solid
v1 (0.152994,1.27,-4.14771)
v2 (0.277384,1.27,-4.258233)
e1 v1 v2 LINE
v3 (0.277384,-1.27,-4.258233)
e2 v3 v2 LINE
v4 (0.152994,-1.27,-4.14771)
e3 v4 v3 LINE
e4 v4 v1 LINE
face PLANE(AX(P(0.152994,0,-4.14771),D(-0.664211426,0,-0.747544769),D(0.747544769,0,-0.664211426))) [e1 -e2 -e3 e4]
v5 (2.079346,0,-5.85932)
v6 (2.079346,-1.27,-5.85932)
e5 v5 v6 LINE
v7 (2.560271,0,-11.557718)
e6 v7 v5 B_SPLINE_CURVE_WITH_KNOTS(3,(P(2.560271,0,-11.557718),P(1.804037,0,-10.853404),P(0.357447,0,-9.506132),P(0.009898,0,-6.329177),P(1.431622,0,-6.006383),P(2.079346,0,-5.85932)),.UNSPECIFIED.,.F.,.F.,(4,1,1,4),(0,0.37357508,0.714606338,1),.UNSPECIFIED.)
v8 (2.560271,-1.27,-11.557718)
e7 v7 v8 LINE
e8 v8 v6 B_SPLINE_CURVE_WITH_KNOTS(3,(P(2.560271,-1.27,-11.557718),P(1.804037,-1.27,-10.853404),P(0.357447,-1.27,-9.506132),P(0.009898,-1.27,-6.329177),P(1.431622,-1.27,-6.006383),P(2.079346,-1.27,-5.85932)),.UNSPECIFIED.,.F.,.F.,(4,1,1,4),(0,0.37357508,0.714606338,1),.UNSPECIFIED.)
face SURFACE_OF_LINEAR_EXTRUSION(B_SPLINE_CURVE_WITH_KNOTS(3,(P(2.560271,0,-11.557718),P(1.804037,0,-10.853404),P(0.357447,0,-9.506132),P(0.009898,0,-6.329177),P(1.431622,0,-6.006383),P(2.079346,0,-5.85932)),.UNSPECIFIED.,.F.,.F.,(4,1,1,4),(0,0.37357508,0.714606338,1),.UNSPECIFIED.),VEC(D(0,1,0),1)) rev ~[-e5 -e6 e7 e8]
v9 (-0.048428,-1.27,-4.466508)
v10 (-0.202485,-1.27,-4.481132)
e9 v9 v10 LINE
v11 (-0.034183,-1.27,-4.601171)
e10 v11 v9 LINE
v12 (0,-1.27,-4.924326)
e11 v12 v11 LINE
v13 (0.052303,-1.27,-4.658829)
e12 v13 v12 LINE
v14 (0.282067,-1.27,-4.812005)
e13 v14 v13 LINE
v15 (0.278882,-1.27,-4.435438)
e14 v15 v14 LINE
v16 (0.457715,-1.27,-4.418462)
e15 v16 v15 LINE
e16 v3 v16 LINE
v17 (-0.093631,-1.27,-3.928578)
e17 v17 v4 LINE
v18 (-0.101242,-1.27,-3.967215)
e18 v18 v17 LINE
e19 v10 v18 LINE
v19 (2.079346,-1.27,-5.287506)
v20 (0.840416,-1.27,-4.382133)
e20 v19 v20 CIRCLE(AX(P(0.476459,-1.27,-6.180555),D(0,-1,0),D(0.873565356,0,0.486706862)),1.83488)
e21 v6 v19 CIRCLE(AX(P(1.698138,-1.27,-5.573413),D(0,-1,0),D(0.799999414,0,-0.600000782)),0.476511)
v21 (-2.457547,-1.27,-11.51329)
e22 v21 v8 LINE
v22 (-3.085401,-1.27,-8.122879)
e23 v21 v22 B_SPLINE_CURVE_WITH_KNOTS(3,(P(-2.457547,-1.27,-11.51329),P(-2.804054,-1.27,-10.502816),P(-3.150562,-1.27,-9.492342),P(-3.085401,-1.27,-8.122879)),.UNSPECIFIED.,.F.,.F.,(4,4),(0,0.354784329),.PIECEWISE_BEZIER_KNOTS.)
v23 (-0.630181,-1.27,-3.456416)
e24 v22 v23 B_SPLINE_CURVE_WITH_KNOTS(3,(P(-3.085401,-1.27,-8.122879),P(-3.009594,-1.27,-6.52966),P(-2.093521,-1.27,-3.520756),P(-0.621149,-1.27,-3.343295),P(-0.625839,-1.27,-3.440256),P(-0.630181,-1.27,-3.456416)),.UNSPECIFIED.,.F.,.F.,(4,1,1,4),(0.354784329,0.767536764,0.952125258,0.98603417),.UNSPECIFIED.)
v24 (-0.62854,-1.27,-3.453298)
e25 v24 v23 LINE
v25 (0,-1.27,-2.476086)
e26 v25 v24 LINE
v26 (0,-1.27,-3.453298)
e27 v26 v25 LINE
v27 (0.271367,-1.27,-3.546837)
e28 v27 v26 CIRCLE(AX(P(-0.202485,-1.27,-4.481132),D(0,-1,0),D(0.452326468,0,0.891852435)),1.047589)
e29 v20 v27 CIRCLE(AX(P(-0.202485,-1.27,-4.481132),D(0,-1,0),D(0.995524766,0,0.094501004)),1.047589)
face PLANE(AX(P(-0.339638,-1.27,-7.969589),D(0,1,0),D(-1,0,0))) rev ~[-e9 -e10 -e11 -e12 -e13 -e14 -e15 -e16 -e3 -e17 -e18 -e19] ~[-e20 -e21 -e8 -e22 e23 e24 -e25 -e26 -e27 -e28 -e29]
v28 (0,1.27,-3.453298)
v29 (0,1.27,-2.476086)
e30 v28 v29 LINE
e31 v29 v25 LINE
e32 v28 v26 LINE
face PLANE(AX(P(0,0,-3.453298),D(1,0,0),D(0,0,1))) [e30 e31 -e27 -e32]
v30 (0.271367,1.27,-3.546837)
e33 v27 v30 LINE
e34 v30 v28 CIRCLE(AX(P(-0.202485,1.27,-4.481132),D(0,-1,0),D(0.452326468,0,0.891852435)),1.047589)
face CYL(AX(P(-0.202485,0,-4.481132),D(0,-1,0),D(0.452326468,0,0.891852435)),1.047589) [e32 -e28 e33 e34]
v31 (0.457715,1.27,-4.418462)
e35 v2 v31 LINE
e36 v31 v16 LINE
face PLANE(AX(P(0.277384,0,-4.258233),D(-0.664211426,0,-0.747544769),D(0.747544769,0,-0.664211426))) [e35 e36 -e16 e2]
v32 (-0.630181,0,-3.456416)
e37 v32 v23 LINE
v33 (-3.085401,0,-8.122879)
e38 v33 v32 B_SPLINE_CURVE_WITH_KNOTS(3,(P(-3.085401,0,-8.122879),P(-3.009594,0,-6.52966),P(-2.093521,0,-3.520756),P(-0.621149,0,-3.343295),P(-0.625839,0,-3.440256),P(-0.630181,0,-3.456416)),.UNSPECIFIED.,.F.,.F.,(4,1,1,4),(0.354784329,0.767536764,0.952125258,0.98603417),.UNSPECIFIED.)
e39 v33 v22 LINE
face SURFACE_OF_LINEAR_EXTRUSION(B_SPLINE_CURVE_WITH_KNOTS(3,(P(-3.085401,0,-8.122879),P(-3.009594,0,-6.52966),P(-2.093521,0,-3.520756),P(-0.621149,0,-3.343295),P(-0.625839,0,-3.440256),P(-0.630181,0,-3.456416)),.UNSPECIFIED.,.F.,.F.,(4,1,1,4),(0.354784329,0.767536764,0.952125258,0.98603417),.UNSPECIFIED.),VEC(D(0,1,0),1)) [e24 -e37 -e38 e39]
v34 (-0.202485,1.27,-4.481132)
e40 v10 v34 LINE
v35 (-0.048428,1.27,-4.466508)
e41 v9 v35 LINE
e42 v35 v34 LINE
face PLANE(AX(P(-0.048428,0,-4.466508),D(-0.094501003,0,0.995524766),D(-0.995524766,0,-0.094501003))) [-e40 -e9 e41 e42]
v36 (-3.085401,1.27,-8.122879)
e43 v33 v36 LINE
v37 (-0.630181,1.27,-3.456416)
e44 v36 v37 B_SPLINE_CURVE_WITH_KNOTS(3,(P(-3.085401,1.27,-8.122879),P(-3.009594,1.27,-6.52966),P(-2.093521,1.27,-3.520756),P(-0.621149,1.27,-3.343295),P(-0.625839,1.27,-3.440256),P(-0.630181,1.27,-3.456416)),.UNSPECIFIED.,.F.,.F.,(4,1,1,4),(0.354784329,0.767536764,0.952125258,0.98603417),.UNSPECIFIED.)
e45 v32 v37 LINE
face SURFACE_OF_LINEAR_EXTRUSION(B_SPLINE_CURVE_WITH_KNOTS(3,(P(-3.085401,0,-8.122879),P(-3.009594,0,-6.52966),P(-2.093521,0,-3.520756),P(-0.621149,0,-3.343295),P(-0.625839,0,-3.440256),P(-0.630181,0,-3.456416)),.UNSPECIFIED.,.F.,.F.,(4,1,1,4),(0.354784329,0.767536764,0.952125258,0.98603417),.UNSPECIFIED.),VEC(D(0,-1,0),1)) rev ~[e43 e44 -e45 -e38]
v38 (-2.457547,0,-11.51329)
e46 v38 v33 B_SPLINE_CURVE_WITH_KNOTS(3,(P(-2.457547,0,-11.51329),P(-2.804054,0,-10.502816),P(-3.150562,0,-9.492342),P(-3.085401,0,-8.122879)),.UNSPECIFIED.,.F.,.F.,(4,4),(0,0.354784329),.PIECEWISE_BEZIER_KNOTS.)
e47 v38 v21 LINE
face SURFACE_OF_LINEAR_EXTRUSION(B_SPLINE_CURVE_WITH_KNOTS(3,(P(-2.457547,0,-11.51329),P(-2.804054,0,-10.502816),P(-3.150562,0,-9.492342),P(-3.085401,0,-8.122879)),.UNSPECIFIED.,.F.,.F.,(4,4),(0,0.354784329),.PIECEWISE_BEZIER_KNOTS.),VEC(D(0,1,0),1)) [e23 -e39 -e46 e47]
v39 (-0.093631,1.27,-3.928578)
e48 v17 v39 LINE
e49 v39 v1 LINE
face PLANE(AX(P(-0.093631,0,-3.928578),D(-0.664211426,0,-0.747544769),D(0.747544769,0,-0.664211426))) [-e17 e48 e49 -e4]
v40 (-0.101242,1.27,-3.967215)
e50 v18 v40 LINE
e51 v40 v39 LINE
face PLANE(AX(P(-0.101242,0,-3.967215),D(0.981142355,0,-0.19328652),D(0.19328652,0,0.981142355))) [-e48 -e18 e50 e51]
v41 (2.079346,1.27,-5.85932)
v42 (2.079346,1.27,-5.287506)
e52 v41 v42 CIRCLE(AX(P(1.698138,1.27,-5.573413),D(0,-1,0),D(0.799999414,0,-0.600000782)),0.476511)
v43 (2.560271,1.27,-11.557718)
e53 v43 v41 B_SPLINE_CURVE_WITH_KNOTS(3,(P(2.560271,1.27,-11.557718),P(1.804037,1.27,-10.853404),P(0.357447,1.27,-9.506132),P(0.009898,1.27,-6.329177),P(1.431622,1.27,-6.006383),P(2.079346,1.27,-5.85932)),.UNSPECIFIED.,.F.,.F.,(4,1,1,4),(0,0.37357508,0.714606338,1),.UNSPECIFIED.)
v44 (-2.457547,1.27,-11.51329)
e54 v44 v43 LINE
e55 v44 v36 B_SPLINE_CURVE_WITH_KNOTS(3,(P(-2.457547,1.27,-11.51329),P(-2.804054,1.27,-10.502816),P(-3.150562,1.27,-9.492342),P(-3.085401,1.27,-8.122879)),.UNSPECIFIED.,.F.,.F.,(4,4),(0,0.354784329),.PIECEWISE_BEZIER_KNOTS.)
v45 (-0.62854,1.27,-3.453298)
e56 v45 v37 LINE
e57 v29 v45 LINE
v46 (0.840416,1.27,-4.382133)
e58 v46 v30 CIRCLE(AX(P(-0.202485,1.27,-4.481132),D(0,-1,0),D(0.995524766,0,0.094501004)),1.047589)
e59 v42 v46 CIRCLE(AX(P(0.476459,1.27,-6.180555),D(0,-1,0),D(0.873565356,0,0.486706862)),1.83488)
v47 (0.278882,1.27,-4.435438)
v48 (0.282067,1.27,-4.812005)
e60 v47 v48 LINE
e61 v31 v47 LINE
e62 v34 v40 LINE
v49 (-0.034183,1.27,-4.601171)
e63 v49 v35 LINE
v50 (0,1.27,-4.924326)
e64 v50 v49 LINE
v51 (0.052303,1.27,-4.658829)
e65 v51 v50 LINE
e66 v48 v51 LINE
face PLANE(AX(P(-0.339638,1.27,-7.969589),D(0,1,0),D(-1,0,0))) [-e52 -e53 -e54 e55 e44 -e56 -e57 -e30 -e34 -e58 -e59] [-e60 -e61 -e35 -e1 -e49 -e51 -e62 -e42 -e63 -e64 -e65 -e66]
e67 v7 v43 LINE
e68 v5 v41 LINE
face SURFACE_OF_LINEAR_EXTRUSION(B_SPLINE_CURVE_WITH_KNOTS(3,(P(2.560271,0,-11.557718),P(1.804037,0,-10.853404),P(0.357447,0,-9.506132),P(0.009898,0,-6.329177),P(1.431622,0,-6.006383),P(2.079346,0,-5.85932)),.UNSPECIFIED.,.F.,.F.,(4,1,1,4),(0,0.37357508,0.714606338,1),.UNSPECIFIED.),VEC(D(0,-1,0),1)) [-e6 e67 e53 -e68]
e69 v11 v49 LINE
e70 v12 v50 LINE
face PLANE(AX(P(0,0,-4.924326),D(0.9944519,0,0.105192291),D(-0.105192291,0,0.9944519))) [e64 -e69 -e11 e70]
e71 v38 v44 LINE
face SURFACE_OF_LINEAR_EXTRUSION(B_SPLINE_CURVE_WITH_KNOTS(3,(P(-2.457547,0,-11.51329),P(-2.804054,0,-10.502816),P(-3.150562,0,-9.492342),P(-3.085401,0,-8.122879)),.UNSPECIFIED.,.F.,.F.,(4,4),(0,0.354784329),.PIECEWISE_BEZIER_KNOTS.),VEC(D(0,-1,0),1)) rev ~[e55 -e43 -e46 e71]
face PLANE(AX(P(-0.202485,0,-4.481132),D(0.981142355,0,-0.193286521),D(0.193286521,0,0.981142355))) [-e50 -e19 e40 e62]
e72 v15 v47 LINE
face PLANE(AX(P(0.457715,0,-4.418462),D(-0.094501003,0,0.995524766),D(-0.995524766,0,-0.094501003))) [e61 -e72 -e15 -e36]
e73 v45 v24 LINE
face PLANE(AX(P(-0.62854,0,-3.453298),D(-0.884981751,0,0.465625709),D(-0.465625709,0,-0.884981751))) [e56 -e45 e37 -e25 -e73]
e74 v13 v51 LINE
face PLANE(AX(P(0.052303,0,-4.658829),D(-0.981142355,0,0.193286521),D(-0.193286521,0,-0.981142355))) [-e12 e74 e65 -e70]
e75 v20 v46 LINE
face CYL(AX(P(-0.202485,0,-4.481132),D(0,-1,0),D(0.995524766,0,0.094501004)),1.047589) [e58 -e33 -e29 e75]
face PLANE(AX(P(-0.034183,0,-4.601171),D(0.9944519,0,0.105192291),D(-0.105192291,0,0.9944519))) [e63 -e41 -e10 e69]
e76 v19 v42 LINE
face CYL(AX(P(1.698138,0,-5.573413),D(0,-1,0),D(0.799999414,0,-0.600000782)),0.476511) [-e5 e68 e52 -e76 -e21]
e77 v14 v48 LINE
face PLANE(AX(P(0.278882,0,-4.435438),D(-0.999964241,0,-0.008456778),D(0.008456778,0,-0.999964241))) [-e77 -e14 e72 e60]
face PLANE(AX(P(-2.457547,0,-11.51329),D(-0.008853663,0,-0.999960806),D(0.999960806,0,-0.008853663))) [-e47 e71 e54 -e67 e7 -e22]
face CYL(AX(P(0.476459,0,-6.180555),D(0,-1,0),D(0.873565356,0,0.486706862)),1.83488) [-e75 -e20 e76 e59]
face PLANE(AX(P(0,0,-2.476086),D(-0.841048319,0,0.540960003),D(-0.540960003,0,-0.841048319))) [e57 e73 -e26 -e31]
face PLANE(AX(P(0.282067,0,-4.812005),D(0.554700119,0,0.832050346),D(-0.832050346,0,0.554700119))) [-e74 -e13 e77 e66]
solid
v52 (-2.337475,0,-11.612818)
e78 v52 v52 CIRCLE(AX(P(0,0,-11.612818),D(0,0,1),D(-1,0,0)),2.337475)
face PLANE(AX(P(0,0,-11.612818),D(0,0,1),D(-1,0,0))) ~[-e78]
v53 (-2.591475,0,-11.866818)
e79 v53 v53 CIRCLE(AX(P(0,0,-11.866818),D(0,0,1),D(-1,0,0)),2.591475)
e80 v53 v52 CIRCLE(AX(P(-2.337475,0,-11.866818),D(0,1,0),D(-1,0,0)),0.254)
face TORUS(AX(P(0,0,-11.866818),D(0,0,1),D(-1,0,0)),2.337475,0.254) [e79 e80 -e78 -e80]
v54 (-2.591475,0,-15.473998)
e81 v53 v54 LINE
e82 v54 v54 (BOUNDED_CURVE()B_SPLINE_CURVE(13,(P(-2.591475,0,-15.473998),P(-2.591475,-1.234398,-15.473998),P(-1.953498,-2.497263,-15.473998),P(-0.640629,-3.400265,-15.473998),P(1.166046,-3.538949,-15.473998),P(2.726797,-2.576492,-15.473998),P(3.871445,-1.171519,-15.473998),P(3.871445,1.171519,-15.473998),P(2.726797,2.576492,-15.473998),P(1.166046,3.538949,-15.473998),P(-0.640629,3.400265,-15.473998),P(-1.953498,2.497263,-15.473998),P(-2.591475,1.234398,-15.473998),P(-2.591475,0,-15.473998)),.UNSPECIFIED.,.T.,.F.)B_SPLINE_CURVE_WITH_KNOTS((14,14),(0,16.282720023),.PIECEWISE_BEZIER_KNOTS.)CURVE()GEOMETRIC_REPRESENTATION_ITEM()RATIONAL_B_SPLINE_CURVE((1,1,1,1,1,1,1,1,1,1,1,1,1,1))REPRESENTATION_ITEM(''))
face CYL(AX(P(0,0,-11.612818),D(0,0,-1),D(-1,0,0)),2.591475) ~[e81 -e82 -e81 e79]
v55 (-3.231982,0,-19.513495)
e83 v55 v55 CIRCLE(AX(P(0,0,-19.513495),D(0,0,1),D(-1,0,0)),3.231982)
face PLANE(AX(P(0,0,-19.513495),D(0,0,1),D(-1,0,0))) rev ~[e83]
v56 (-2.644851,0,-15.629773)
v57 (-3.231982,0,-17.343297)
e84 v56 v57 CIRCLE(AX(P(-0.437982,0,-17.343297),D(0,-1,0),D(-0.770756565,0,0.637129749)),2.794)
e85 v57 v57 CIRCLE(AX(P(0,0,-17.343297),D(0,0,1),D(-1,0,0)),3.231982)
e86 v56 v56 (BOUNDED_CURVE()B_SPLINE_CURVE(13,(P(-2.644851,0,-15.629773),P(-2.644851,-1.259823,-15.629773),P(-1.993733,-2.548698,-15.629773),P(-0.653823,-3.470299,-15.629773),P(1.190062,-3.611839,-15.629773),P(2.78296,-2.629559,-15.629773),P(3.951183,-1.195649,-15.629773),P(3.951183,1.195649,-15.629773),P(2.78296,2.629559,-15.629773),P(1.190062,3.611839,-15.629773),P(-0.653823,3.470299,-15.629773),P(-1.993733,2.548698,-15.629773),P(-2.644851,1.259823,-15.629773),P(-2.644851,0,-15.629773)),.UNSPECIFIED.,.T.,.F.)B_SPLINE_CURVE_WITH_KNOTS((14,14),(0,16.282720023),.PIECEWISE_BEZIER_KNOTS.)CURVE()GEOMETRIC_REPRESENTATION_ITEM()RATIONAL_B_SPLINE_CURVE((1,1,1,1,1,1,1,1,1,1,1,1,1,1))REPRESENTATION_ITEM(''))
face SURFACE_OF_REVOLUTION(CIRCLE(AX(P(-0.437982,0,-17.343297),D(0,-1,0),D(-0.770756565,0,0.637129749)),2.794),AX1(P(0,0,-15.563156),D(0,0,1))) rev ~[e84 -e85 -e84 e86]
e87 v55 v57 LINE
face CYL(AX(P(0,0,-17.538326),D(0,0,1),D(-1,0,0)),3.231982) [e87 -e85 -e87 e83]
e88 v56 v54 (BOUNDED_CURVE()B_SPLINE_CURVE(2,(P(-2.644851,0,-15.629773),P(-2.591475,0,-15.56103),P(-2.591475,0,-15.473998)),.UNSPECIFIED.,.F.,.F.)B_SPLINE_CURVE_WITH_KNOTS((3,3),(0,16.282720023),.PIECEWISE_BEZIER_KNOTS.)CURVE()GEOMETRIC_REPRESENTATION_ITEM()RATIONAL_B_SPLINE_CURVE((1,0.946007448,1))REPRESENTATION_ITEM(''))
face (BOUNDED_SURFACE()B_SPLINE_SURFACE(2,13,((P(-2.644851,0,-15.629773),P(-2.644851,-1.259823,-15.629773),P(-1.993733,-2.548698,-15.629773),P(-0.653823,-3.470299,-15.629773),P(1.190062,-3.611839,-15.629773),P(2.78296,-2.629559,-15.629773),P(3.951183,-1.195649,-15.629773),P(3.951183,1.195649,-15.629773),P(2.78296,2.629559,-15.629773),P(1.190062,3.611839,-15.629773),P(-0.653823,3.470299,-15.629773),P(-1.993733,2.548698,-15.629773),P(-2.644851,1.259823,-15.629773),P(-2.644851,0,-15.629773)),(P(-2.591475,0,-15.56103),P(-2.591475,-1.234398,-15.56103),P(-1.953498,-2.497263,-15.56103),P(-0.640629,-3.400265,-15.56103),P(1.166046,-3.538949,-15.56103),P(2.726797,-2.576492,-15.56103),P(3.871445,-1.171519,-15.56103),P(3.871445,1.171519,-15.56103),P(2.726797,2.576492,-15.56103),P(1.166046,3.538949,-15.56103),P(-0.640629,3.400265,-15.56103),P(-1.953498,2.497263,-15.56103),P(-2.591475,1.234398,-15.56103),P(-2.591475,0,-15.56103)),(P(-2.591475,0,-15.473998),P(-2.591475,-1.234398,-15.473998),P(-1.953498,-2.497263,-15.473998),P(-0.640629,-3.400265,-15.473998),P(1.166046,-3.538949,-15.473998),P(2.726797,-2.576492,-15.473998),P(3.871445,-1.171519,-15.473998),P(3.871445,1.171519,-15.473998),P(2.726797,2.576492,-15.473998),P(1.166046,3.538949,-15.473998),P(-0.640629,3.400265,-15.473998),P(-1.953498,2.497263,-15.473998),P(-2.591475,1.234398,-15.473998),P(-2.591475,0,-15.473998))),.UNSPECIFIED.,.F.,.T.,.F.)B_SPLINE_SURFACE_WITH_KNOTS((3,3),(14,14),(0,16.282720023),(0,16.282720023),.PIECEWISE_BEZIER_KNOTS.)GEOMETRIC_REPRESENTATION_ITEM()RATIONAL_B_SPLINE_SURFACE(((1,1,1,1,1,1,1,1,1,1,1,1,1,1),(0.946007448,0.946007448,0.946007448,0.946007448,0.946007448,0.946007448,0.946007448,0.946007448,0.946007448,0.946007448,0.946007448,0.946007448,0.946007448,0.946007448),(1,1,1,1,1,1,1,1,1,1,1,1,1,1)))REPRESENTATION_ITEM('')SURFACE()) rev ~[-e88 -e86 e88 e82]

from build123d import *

# Parameters (mm, degrees)
F0_W     = 0.6405061577
F0_H     = 3.9503388107
F3_DEPTH = 1.27
F5_R     = 0.254


# Not quite as in the source:
# - a fillet or chamfer that OpenCascade refuses, or shapes differently, is made with other operations: its cross-section is extruded or revolved along the edge and cut away or added


with BuildPart() as f1:
    # F0 (on Front) → F1 (revolve)
    with BuildSketch(Plane.XZ):
        Polygon((-2.5914753787, -19.5134952664), (0, -19.5134952664), (0, -11.6128176451), (-2.5914753787, -11.6128176451), (-2.5914753787, -15.5631564558), align=None)
        with Locations((-2.9117284575, -17.5383258611)):
            Rectangle(F0_W, F0_H)
    revolve(axis=Axis((0, 0, -15.5631564558), (0, 0, 1)))

    # F4: fillet of radius 2.794 on 1 edges, made by hand

    # F4_s1 → F4_t2 (revolve, cut)
    with BuildSketch(Plane.XZ):
        with BuildLine():
            ThreePointArc((-2.5914753787, -15.5631564558), (-3.0669830384, -16.397365106), (-3.2319815364, -17.3432969758))
            Line((-3.2319815364, -17.3432969758), (-3.2319815364, -15.5631564558))
            Line((-3.2319815364, -15.5631564558), (-2.5914753787, -15.5631564558))
        make_face()
    revolve(axis=Axis((0, 0, -15.5631564558), (0, 0, 1)), mode=Mode.SUBTRACT)

    # F5
    f5_edges = [f1.edges().sort_by_distance(p)[0] for p in [
        (-2.591475, 0, -13.587987),
        (2.591475, 0, -15.563156),
        (2.591475, 0, -11.612818),
    ]]
    fillet(f5_edges, radius=F5_R)


with BuildPart() as f3:
    # F2 (on Front) → F3 (new body, symmetric)
    with BuildSketch(Plane.XZ):
        with BuildLine():
            add(Edge.make_bspline(
                [(-2.4575470015, -11.5132899955), (-2.8040543568, -10.5028159539), (-3.1505617121, -9.4923419122), (-3.0854009092, -8.1228790805)],
                knots=[0, 0, 0, 0, 0.3547843289, 0.3547843289, 0.3547843289, 0.3547843289], degree=3))
            Line((-2.4575470015, -11.5132899955), (2.560271183, -11.5577178076))
            add(Edge.make_bspline(
                [(2.560271183, -11.5577178076), (1.8040367585, -10.8534037399), (0.3574469273, -9.5061316042), (0.0098981732, -6.329177487), (1.4316217442, -6.0063825673), (2.07934645, -5.859320052)],
                knots=[0, 0, 0, 0, 0.3735750804, 0.7146063376, 1, 1, 1, 1], degree=3))
            Line((2.07934645, -5.859320052), (1.7303656682, -5.5492422712))
            Line((1.7303656682, -5.5492422712), (0.4577149879, -4.418461669))
            Line((0.4577149879, -4.418461669), (0.2788823039, -4.4354375079))
            Line((0.2788823039, -4.4354375079), (0.2820669615, -4.8120045103))
            Line((0.2820669615, -4.8120045103), (0.0523033026, -4.6588287686))
            Line((0.0523033026, -4.6588287686), (0, -4.9243257381))
            Line((0, -4.9243257381), (-0.0341830133, -4.6011712362))
            Line((-0.0341830133, -4.6011712362), (-0.0484276129, -4.4665076697))
            Line((-0.0484276129, -4.4665076697), (-0.2024847872, -4.4811316731))
            Line((-0.2024847872, -4.4811316731), (-0.1012423936, -3.9672148204))
            Line((-0.1012423936, -3.9672148204), (-0.0936308252, -3.9285777125))
            Line((-0.0936308252, -3.9285777125), (-0.6285401519, -3.4532979677))
            Line((-0.6285401519, -3.4532979677), (-0.6301807522, -3.4564161403))
            Line((-0.6301807522, -3.4564161403), (-3.0854009092, -8.1228790805))
        make_face()
        with BuildLine():
            add(Edge.make_bspline(
                [(-3.0854009092, -8.1228790805), (-3.009593502, -6.5296601241), (-2.0935214667, -3.5207561612), (-0.6211493091, -3.3432954942), (-0.6258393316, -3.4402559318), (-0.6301807522, -3.4564161403)],
                knots=[0.3547843289, 0.3547843289, 0.3547843289, 0.3547843289, 0.7675367637, 0.9521252582, 0.9860341697, 0.9860341697, 0.9860341697, 0.9860341697], degree=3))
            Line((-3.0854009092, -8.1228790805), (-0.6301807522, -3.4564161403))
        make_face()
        with BuildLine():
            Line((1.7303656682, -5.5492422712), (2.07934645, -5.859320052))
            ThreePointArc((2.07934645, -5.859320052), (2.1746489219, -5.573413102), (2.07934645, -5.2875061519))
            Line((2.07934645, -5.2875061519), (1.7303656682, -5.5492422712))
        make_face()
        Polygon((0, -3.4532979677), (-0.6285401519, -3.4532979677), (-0.0936308252, -3.9285777125), align=None)
        Polygon((0, -2.4760859087), (-0.6285401519, -3.4532979677), (0, -3.4532979677), align=None)
        with BuildLine():
            Line((1.7303656682, -5.5492422712), (2.07934645, -5.2875061519))
            ThreePointArc((2.07934645, -5.2875061519), (1.5590688172, -4.699089309), (0.8404157707, -4.3821334839))
            Line((0.8404157707, -4.3821334839), (0.4577149879, -4.418461669))
            Line((0.4577149879, -4.418461669), (1.7303656682, -5.5492422712))
        make_face()
        with BuildLine():
            Line((0, -3.4532979677), (-0.0936308252, -3.9285777125))
            Line((-0.0936308252, -3.9285777125), (0.1529944372, -4.1477101634))
            Line((0.1529944372, -4.1477101634), (0.2713673383, -3.5468370845))
            ThreePointArc((0.2713673383, -3.5468370845), (0.1389025243, -3.4907292708), (0, -3.4532979677))
        make_face()
        with BuildLine():
            Line((0.4577149879, -4.418461669), (0.8404157707, -4.3821334839))
            ThreePointArc((0.8404157707, -4.3821334839), (0.6632892562, -3.891320245), (0.2713673383, -3.5468370845))
            Line((0.2713673383, -3.5468370845), (0.2773836709, -4.2582329759))
            Line((0.2773836709, -4.2582329759), (0.4577149879, -4.418461669))
        make_face()
        Polygon((0.2713673383, -3.5468370845), (0.1529944372, -4.1477101634), (0.2773836709, -4.2582329759), align=None)
    extrude(amount=F3_DEPTH, both=True)


solid = Compound([f1.part, f3.part])
